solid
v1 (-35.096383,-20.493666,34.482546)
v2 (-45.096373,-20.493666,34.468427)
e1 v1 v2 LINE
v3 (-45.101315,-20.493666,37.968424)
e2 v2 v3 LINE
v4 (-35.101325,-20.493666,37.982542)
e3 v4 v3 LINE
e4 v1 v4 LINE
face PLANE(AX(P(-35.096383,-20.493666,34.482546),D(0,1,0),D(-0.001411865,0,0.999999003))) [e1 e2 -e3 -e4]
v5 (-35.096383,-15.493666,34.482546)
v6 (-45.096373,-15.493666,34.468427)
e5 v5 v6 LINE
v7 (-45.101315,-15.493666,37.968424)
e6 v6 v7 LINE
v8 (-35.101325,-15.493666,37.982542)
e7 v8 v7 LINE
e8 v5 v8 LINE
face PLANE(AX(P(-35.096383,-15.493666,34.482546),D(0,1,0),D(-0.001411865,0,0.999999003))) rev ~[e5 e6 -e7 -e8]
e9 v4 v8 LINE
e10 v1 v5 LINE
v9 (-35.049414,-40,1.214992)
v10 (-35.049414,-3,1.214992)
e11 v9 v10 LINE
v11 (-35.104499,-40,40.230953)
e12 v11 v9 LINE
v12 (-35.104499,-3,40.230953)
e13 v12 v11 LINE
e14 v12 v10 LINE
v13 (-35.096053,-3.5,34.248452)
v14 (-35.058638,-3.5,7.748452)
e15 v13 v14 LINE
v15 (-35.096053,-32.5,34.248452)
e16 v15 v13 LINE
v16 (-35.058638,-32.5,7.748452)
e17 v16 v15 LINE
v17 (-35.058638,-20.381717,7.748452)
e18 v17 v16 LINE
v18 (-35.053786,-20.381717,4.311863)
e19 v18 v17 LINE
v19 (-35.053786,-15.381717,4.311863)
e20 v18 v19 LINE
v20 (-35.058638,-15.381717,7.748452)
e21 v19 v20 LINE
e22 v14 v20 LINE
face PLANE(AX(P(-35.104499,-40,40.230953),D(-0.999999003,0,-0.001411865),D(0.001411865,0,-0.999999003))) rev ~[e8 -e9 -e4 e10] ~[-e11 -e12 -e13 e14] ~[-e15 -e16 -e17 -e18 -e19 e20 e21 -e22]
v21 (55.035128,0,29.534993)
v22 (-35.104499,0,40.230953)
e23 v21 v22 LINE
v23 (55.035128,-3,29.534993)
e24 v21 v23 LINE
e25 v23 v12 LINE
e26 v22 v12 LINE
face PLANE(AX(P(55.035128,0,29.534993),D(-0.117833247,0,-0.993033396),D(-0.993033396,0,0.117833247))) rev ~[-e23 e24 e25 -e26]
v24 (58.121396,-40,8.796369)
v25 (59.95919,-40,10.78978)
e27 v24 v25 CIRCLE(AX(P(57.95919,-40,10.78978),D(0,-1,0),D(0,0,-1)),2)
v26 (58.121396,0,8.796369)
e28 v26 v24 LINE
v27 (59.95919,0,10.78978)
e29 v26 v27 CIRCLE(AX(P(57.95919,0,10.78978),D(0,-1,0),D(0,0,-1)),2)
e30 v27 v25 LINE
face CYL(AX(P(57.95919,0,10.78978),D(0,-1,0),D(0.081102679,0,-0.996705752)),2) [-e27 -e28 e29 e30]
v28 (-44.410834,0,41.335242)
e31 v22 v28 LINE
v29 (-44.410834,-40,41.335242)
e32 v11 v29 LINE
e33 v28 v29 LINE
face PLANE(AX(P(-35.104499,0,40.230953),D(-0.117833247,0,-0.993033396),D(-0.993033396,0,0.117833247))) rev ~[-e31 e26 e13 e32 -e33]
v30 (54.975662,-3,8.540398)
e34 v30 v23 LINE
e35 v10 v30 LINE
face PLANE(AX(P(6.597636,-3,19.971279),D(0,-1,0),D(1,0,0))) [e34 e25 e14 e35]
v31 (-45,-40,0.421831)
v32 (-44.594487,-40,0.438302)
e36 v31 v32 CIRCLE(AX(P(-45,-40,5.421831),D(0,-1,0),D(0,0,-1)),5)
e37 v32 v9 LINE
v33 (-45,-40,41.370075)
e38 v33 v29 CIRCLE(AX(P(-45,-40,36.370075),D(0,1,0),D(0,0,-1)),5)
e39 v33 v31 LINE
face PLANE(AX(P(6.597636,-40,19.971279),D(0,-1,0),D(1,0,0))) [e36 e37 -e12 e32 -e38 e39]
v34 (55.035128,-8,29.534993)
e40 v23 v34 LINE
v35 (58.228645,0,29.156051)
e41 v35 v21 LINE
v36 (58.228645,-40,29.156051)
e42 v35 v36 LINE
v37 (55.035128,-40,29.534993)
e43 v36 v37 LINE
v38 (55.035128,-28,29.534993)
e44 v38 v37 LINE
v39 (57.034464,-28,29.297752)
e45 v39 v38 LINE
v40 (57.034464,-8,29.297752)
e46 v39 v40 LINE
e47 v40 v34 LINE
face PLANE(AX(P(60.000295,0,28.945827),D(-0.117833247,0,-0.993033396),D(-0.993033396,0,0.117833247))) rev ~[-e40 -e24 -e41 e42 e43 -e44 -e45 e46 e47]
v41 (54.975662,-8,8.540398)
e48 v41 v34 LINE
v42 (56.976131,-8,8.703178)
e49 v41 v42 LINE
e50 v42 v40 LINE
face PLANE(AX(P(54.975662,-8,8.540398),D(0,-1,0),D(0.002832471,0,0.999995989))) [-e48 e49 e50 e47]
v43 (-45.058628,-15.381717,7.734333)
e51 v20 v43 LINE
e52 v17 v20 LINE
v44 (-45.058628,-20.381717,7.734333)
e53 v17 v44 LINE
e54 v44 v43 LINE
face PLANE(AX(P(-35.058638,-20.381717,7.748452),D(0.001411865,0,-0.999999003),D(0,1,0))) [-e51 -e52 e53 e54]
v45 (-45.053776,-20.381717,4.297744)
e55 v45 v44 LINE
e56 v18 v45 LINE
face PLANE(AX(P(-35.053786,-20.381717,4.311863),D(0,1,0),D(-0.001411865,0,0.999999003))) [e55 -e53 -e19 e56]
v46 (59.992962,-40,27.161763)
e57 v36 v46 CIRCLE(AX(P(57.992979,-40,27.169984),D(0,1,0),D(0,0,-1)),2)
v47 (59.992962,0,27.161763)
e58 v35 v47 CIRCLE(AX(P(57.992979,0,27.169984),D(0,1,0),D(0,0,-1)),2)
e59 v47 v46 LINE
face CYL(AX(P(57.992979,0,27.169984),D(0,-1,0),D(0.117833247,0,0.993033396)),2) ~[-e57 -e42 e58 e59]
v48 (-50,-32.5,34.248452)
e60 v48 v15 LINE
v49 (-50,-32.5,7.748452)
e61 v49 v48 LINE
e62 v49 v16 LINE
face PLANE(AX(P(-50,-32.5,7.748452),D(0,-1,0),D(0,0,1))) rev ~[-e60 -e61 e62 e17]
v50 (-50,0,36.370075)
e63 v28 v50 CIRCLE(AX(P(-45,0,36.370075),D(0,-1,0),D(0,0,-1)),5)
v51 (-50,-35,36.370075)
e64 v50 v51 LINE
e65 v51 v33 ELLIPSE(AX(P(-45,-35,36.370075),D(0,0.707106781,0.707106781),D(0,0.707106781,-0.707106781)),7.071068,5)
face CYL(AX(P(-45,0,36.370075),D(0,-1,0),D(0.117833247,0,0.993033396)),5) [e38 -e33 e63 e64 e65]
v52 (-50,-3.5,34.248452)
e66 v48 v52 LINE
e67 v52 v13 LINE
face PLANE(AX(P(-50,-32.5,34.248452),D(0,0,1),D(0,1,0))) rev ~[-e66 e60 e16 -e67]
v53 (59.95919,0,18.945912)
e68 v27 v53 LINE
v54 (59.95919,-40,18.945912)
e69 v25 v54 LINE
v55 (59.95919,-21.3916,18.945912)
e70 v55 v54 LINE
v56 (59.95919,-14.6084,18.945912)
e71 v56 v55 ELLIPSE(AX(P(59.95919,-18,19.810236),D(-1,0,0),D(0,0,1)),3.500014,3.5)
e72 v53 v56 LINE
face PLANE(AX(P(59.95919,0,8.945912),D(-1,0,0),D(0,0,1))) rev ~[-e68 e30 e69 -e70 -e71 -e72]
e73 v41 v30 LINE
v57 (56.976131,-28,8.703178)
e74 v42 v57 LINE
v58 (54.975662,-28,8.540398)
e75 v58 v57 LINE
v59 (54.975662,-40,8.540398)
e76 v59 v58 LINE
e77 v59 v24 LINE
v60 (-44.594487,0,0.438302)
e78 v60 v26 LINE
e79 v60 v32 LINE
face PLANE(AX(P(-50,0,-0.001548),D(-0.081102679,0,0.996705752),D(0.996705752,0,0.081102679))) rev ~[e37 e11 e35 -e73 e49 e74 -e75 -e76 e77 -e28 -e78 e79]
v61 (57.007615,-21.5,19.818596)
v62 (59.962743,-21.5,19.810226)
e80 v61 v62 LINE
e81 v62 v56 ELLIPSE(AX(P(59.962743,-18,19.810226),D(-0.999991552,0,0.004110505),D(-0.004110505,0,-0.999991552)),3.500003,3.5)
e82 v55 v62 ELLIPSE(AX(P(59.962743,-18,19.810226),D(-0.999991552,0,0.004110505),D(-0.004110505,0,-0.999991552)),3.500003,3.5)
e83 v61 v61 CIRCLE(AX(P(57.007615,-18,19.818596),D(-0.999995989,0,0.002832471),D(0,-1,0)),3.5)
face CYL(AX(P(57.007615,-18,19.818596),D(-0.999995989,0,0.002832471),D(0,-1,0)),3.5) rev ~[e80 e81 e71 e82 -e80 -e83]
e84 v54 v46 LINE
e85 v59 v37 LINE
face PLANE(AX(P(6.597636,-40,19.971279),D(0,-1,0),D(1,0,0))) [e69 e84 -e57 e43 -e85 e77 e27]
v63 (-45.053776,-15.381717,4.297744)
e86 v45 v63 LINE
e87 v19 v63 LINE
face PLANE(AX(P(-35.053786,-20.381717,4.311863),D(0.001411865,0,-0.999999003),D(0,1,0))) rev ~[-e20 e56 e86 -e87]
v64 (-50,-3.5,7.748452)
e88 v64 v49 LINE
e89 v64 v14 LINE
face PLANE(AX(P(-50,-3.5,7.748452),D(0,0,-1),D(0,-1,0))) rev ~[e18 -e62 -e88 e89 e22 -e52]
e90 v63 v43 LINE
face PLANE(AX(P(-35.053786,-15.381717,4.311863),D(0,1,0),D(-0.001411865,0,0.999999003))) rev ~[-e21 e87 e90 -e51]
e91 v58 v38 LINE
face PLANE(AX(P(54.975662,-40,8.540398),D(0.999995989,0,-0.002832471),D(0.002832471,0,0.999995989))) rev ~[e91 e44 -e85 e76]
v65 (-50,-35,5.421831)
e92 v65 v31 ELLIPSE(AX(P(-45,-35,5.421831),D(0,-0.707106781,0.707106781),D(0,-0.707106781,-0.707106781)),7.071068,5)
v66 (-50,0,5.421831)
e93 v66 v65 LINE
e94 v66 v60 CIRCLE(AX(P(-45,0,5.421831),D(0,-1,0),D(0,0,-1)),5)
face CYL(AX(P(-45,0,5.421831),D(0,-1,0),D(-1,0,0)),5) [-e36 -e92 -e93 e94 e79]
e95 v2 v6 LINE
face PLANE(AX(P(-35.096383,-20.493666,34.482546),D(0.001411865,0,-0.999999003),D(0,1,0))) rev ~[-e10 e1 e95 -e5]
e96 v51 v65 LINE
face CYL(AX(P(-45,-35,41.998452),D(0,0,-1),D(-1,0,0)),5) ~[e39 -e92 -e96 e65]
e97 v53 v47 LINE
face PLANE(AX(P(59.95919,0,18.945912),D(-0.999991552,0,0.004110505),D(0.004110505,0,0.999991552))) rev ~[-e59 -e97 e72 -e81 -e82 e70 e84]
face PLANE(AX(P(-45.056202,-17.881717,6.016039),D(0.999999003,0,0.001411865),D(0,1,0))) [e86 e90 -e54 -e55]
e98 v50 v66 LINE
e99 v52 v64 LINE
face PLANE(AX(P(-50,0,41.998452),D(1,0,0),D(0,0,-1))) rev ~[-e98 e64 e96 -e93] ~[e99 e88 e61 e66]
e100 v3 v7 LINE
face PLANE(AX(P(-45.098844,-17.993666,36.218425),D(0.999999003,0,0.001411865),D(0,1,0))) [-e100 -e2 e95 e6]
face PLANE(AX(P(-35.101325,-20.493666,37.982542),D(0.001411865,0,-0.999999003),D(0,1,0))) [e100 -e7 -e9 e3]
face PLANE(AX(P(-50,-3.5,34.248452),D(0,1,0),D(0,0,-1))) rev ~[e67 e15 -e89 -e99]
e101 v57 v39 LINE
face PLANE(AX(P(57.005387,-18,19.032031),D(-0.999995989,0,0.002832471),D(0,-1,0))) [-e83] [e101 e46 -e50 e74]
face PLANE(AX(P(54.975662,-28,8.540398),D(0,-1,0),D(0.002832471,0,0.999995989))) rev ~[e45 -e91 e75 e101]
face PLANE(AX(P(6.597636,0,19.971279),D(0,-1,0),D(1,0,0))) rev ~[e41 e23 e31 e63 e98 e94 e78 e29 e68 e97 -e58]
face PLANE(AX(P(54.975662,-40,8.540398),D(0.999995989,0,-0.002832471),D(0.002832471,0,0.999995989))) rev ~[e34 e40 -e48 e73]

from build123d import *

# Parameters (mm, degrees)
F1_DEPTH  = 40
F3_DEPTH  = 37
F5_DEPTH  = 25
F6_R      = 5
F7_R      = 2
F9_W      = 5
F9_H      = 3.5
F9_H_2    = 3.4365921294
F10_DEPTH = 10
F11_W     = 20
F11_H     = 20.9946793665
F12_DEPTH = 2
F13_R     = 3.5
F14_DEPTH = 25


with BuildPart() as f1:
    # F0 (on Front) → F1 (new body)
    with BuildSketch(Plane.XZ):
        Polygon((-35.1044990334, 40.2309528088), (-35.0494137004, 1.2149916954), (54.9756615806, 8.540398173), (55.0351284044, 29.5349933202), align=None)
        Polygon((-49.999999976, 41.9984515125), (-49.999999976, -0.0015484875), (-35.0494137004, 1.2149916954), (-35.1044990334, 40.2309528088), align=None)
        Polygon((55.0351284044, 29.5349933202), (54.9756615806, 8.540398173), (59.9591903392, 8.9459115673), (59.9591903392, 18.9459115673), (60.0002953853, 28.9458270857), align=None)
    extrude(amount=F1_DEPTH)

    # F2 (on face) → F3 (cut)
    with BuildSketch(Plane.XZ.offset(40)):
        Polygon((-35.1044990334, 40.2309528088), (-35.0494137004, 1.2149916954), (54.9756615806, 8.540398173), (55.0351284044, 29.5349933202), align=None)
    extrude(amount=-F3_DEPTH, mode=Mode.SUBTRACT)

    # F4 (on face) → F5 (cut)
    with BuildSketch(Plane(origin=(-49.999999976, 0, 0), x_dir=(0, -1, 0), z_dir=(-1, 0, 0))):
        Polygon((3.5, 34.2484515125), (3.5, 20.9984515125), (3.5, 7.7484515125), (32.5, 7.7484515125), (32.5, 34.2484515125), align=None)
    extrude(amount=-F5_DEPTH, mode=Mode.SUBTRACT)

    # F6
    f6_edges = [f1.edges().sort_by_distance(p)[0] for p in [
        (-50, -20, 41.998452),
        (-50, -20, -0.001548),
        (-50, -40, 20.998452),
    ]]
    fillet(f6_edges, radius=F6_R)

    # F7
    f7_edges = [f1.edges().sort_by_distance(p)[0] for p in [
        (60.000295, -20, 28.945827),
        (59.95919, -20, 8.945912),
    ]]
    fillet(f7_edges, radius=F7_R)

    # F9 (on face) → F10 (cut)
    with BuildSketch(Plane(origin=(-35.0476284314, 0, -0.0494825765), x_dir=(0, 1, 0), z_dir=(0.9999990033, 0, 0.0014118652))):
        with Locations((-17.9936658144, 36.2820627093)):
            Rectangle(F9_W, F9_H)
        with Locations((-17.8817171156, 6.0796457964)):
            Rectangle(F9_W, F9_H_2)
    extrude(amount=-F10_DEPTH, mode=Mode.SUBTRACT)

    # F11 (on face) → F12 (cut)
    with BuildSketch(Plane(origin=(54.9510301824, 0, -0.1556478324), x_dir=(0, -1, 0), z_dir=(-0.9999959885, 0, 0.0028324712))):
        with Locations((18, 19.1934205725)):
            Rectangle(F11_W, F11_H)
    extrude(amount=-F12_DEPTH, mode=Mode.SUBTRACT)

    # F13 (on face) → F14 (cut)
    with BuildSketch(Plane(origin=(56.9510221594, 0, -0.1613127747), x_dir=(0, -1, 0), z_dir=(-0.9999959885, 0, 0.0028324712))):
        with Locations((18, 19.9799891561)):
            Circle(F13_R)
    extrude(amount=-F14_DEPTH, mode=Mode.SUBTRACT)


solid = f1.part
